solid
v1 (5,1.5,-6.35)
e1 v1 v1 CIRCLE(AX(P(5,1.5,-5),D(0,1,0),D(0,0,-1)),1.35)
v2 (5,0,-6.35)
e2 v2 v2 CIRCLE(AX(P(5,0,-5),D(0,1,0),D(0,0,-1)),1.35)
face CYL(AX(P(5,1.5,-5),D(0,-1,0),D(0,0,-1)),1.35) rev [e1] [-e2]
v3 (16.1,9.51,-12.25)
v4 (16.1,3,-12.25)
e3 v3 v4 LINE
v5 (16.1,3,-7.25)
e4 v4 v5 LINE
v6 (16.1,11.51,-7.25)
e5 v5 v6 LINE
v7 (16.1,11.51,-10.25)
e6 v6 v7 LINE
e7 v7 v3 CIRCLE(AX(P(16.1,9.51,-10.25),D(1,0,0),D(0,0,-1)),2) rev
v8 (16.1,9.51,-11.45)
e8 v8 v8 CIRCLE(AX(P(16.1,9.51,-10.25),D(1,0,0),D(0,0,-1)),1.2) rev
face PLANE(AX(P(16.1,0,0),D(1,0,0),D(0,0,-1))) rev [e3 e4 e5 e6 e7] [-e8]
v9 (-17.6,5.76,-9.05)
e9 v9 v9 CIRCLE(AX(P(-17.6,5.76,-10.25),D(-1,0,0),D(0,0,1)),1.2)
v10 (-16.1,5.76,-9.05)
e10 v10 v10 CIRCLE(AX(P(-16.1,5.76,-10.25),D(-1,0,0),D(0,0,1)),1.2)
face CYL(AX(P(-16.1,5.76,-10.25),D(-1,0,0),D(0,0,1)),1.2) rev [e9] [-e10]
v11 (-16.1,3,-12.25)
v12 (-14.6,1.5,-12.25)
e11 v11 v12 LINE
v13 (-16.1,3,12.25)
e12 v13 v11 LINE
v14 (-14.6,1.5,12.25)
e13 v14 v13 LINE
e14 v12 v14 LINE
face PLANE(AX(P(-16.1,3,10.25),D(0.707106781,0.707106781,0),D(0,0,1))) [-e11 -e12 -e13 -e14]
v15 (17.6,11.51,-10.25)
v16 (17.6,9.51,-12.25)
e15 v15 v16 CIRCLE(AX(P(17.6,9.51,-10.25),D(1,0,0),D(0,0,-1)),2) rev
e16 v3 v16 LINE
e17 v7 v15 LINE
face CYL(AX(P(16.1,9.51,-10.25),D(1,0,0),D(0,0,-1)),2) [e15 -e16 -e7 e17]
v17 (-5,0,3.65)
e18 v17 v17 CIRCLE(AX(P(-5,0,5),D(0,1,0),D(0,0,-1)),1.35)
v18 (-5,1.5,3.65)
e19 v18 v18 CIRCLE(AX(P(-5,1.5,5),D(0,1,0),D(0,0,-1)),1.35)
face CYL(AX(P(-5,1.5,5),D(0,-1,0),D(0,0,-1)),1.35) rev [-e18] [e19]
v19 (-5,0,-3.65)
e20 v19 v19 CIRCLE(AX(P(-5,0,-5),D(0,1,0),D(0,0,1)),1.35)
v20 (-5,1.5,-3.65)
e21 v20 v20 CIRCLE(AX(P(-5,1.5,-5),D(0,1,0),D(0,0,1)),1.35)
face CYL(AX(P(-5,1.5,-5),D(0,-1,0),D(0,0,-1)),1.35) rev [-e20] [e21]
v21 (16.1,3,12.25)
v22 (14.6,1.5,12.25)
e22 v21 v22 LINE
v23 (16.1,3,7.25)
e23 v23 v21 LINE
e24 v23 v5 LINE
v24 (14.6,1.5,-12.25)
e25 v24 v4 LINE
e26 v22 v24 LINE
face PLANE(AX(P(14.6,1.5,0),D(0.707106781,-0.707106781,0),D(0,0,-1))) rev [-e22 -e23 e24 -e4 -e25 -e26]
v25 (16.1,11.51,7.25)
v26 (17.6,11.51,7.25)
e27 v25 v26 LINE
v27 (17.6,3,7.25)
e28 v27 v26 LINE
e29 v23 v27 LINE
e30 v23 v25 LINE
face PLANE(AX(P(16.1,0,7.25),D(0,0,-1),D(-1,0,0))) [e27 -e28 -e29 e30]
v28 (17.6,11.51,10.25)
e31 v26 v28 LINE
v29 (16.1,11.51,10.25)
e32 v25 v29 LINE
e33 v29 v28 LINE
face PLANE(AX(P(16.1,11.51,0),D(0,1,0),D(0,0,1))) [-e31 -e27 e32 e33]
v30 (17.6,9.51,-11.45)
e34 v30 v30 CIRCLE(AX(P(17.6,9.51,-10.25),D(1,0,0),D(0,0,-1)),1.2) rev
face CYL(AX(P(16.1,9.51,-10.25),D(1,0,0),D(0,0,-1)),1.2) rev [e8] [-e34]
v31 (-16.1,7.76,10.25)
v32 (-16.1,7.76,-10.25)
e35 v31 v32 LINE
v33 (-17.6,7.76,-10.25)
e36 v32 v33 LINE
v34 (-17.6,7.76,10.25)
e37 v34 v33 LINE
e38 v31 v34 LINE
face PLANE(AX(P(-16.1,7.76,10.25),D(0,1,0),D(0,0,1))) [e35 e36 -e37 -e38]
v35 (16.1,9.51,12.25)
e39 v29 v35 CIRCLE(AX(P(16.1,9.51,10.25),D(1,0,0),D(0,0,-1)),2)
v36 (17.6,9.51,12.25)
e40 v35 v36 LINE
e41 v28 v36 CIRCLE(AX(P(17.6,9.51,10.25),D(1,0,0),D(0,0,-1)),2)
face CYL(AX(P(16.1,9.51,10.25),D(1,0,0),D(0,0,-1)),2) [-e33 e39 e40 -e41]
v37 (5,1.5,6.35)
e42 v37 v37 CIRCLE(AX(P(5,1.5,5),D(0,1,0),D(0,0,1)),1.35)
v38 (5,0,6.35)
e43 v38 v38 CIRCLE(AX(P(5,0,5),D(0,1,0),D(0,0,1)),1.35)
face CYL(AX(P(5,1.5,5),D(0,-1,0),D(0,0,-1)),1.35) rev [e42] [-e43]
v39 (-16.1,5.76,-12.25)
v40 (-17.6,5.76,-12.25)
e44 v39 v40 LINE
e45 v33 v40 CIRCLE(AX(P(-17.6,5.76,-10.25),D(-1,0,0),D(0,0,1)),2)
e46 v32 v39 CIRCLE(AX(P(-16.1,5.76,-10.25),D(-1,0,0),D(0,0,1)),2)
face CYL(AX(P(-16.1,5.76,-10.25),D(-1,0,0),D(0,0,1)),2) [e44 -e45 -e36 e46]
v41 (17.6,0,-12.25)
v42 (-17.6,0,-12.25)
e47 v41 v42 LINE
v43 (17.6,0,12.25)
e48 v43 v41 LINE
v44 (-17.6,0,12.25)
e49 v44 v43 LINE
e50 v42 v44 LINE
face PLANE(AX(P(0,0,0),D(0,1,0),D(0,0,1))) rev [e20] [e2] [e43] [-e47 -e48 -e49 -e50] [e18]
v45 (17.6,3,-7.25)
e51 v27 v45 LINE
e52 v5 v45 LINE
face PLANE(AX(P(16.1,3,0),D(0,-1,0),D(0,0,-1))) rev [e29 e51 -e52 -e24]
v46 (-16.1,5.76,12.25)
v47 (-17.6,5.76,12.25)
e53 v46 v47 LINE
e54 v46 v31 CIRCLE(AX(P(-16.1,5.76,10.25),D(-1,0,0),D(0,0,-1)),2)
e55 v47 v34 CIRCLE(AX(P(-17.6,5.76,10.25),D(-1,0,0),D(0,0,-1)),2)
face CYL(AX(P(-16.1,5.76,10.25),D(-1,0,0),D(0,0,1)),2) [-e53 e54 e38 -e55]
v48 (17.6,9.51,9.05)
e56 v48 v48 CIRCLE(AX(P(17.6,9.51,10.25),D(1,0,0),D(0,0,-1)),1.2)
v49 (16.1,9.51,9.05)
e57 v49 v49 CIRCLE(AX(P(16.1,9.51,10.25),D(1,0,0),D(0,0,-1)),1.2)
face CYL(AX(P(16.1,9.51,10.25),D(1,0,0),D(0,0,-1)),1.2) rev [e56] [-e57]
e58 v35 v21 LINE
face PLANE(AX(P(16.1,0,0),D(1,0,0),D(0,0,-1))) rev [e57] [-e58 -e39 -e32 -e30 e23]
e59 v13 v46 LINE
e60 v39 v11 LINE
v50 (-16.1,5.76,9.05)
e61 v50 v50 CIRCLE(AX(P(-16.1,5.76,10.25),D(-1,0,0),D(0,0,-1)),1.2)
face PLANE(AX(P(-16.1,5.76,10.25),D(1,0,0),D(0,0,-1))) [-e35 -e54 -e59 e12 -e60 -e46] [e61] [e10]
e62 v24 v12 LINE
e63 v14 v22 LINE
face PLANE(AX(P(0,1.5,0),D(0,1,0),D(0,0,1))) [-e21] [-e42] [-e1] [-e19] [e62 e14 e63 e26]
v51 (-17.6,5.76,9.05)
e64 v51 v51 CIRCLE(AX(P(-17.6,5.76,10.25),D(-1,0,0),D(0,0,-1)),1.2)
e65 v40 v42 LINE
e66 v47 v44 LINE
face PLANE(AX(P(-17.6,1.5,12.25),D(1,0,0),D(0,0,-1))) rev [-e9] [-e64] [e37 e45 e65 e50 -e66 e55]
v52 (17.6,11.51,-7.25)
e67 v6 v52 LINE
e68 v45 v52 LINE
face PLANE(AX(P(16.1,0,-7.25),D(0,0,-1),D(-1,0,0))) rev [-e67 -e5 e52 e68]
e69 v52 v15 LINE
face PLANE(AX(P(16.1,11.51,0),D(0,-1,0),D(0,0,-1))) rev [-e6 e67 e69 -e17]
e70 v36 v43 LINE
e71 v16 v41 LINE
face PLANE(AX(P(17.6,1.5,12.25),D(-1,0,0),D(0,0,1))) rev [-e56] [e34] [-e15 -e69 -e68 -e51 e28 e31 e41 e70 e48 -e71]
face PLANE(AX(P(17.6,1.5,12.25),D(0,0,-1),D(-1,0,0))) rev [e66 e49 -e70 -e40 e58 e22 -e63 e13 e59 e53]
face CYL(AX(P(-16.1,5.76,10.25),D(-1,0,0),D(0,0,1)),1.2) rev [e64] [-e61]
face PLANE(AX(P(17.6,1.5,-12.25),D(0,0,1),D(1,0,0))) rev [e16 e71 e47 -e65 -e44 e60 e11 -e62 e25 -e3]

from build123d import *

# Parameters (mm, degrees)
SKETCH1_W           = 35.2
SKETCH1_H           = 24.5
SKETCH1_R           = 1.35
BOSS_EXTRUDE1_DEPTH = 1.5
SKETCH2_R           = 1.2
SKETCH2_W           = 5
SKETCH2_H           = 1.5
SKETCH2_W_2         = 14.5
BOSS_EXTRUDE2_DEPTH = 1.5
SKETCH3_R           = 1.2
BOSS_EXTRUDE3_DEPTH = 1.5
CHAMFER1_SIZE       = 1.5


with BuildPart() as part:
    # Sketch1 → Boss-Extrude1 (new body)
    with BuildSketch(Plane(origin=(0, 0, 0), x_dir=(1, 0, 0), z_dir=(0, 1, 0))):
        Rectangle(SKETCH1_W, SKETCH1_H)
        with Locations(Location((-5, 5, 0), (0, 0, 270))):
            Circle(SKETCH1_R, mode=Mode.SUBTRACT)
        with Locations(Location((5, 5, 0), (0, 0, 90))):
            Circle(SKETCH1_R, mode=Mode.SUBTRACT)
        with Locations(Location((-5, -5, 0), (0, 0, 90))):
            Circle(SKETCH1_R, mode=Mode.SUBTRACT)
        with Locations(Location((5, -5, 0), (0, 0, 270))):
            Circle(SKETCH1_R, mode=Mode.SUBTRACT)
    extrude(amount=BOSS_EXTRUDE1_DEPTH)

    # Sketch2 → Boss-Extrude2 (add)
    # profile 1 of 6: a face of its own
    with BuildSketch(Plane(origin=(17.6, 0, 0), x_dir=(0, 0, -1), z_dir=(1, 0, 0))):
        with BuildLine():
            Line((-7.25, 1.5), (-7.25, 3))
            Line((-7.25, 3), (-7.25, 11.51))
            Line((-7.25, 11.51), (-10.25, 11.51))
            ThreePointArc((-10.25, 11.51), (-11.664213562, 10.924213562), (-12.25, 9.51))
            Line((-12.25, 9.51), (-12.25, 1.5))
            Line((-12.25, 1.5), (-7.25, 1.5))
        make_face()
        with Locations((-10.25, 9.51)):
            Circle(SKETCH2_R, mode=Mode.SUBTRACT)
    # profile 2 of 6: a face of its own
    with BuildSketch(Plane(origin=(17.6, 0, 0), x_dir=(0, 0, -1), z_dir=(1, 0, 0))):
        with Locations((-9.75, 0.75)):
            Rectangle(SKETCH2_W, SKETCH2_H)
    # profile 3 of 6: a face of its own
    with BuildSketch(Plane(origin=(17.6, 0, 0), x_dir=(0, 0, -1), z_dir=(1, 0, 0))):
        with Locations((0, 0.75)):
            Rectangle(SKETCH2_W_2, SKETCH2_H)
    # profile 4 of 6: a face of its own
    with BuildSketch(Plane(origin=(17.6, 0, 0), x_dir=(0, 0, -1), z_dir=(1, 0, 0))):
        with Locations((0, 2.25)):
            Rectangle(SKETCH2_W_2, SKETCH2_H)
    # profile 5 of 6: a face of its own
    with BuildSketch(Plane(origin=(17.6, 0, 0), x_dir=(0, 0, -1), z_dir=(1, 0, 0))):
        with Locations((9.75, 0.75)):
            Rectangle(SKETCH2_W, SKETCH2_H)
    # profile 6 of 6: a face of its own
    with BuildSketch(Plane(origin=(17.6, 0, 0), x_dir=(0, 0, -1), z_dir=(1, 0, 0))):
        with BuildLine():
            Line((7.25, 11.51), (7.25, 3))
            Line((7.25, 3), (7.25, 1.5))
            Line((7.25, 1.5), (12.25, 1.5))
            Line((12.25, 1.5), (12.25, 9.51))
            ThreePointArc((12.25, 9.51), (11.664213562, 10.924213562), (10.25, 11.51))
            Line((10.25, 11.51), (7.25, 11.51))
        make_face()
        with Locations((10.25, 9.51)):
            Circle(SKETCH2_R, mode=Mode.SUBTRACT)
    extrude(amount=-BOSS_EXTRUDE2_DEPTH)

    # Sketch3 → Boss-Extrude3 (add)
    with BuildSketch(Plane.ZY.offset(17.6)):
        with BuildLine():
            Line((-12.25, 0), (12.25, 0))
            Line((12.25, 0), (12.25, 5.76))
            ThreePointArc((12.25, 5.76), (11.664213562, 7.174213562), (10.25, 7.76))
            Line((10.25, 7.76), (-10.25, 7.76))
            ThreePointArc((-10.25, 7.76), (-11.664213562, 7.174213562), (-12.25, 5.76))
            Line((-12.25, 5.76), (-12.25, 0))
        make_face()
        with Locations((-10.25, 5.76)):
            Circle(SKETCH3_R, mode=Mode.SUBTRACT)
        with Locations(Location((10.25, 5.76, 0), (0, 0, 180))):
            Circle(SKETCH3_R, mode=Mode.SUBTRACT)
    extrude(amount=-BOSS_EXTRUDE3_DEPTH)

    # Chamfer1
    chamfer1_edges = [part.edges().sort_by_distance(p)[0] for p in [
        (16.1, 1.5, 0),
        (-16.1, 1.5, 0),
    ]]
    chamfer(chamfer1_edges, length=CHAMFER1_SIZE - 0.0001)  # a hair under: the kernel refuses the full size


solid = part.part
